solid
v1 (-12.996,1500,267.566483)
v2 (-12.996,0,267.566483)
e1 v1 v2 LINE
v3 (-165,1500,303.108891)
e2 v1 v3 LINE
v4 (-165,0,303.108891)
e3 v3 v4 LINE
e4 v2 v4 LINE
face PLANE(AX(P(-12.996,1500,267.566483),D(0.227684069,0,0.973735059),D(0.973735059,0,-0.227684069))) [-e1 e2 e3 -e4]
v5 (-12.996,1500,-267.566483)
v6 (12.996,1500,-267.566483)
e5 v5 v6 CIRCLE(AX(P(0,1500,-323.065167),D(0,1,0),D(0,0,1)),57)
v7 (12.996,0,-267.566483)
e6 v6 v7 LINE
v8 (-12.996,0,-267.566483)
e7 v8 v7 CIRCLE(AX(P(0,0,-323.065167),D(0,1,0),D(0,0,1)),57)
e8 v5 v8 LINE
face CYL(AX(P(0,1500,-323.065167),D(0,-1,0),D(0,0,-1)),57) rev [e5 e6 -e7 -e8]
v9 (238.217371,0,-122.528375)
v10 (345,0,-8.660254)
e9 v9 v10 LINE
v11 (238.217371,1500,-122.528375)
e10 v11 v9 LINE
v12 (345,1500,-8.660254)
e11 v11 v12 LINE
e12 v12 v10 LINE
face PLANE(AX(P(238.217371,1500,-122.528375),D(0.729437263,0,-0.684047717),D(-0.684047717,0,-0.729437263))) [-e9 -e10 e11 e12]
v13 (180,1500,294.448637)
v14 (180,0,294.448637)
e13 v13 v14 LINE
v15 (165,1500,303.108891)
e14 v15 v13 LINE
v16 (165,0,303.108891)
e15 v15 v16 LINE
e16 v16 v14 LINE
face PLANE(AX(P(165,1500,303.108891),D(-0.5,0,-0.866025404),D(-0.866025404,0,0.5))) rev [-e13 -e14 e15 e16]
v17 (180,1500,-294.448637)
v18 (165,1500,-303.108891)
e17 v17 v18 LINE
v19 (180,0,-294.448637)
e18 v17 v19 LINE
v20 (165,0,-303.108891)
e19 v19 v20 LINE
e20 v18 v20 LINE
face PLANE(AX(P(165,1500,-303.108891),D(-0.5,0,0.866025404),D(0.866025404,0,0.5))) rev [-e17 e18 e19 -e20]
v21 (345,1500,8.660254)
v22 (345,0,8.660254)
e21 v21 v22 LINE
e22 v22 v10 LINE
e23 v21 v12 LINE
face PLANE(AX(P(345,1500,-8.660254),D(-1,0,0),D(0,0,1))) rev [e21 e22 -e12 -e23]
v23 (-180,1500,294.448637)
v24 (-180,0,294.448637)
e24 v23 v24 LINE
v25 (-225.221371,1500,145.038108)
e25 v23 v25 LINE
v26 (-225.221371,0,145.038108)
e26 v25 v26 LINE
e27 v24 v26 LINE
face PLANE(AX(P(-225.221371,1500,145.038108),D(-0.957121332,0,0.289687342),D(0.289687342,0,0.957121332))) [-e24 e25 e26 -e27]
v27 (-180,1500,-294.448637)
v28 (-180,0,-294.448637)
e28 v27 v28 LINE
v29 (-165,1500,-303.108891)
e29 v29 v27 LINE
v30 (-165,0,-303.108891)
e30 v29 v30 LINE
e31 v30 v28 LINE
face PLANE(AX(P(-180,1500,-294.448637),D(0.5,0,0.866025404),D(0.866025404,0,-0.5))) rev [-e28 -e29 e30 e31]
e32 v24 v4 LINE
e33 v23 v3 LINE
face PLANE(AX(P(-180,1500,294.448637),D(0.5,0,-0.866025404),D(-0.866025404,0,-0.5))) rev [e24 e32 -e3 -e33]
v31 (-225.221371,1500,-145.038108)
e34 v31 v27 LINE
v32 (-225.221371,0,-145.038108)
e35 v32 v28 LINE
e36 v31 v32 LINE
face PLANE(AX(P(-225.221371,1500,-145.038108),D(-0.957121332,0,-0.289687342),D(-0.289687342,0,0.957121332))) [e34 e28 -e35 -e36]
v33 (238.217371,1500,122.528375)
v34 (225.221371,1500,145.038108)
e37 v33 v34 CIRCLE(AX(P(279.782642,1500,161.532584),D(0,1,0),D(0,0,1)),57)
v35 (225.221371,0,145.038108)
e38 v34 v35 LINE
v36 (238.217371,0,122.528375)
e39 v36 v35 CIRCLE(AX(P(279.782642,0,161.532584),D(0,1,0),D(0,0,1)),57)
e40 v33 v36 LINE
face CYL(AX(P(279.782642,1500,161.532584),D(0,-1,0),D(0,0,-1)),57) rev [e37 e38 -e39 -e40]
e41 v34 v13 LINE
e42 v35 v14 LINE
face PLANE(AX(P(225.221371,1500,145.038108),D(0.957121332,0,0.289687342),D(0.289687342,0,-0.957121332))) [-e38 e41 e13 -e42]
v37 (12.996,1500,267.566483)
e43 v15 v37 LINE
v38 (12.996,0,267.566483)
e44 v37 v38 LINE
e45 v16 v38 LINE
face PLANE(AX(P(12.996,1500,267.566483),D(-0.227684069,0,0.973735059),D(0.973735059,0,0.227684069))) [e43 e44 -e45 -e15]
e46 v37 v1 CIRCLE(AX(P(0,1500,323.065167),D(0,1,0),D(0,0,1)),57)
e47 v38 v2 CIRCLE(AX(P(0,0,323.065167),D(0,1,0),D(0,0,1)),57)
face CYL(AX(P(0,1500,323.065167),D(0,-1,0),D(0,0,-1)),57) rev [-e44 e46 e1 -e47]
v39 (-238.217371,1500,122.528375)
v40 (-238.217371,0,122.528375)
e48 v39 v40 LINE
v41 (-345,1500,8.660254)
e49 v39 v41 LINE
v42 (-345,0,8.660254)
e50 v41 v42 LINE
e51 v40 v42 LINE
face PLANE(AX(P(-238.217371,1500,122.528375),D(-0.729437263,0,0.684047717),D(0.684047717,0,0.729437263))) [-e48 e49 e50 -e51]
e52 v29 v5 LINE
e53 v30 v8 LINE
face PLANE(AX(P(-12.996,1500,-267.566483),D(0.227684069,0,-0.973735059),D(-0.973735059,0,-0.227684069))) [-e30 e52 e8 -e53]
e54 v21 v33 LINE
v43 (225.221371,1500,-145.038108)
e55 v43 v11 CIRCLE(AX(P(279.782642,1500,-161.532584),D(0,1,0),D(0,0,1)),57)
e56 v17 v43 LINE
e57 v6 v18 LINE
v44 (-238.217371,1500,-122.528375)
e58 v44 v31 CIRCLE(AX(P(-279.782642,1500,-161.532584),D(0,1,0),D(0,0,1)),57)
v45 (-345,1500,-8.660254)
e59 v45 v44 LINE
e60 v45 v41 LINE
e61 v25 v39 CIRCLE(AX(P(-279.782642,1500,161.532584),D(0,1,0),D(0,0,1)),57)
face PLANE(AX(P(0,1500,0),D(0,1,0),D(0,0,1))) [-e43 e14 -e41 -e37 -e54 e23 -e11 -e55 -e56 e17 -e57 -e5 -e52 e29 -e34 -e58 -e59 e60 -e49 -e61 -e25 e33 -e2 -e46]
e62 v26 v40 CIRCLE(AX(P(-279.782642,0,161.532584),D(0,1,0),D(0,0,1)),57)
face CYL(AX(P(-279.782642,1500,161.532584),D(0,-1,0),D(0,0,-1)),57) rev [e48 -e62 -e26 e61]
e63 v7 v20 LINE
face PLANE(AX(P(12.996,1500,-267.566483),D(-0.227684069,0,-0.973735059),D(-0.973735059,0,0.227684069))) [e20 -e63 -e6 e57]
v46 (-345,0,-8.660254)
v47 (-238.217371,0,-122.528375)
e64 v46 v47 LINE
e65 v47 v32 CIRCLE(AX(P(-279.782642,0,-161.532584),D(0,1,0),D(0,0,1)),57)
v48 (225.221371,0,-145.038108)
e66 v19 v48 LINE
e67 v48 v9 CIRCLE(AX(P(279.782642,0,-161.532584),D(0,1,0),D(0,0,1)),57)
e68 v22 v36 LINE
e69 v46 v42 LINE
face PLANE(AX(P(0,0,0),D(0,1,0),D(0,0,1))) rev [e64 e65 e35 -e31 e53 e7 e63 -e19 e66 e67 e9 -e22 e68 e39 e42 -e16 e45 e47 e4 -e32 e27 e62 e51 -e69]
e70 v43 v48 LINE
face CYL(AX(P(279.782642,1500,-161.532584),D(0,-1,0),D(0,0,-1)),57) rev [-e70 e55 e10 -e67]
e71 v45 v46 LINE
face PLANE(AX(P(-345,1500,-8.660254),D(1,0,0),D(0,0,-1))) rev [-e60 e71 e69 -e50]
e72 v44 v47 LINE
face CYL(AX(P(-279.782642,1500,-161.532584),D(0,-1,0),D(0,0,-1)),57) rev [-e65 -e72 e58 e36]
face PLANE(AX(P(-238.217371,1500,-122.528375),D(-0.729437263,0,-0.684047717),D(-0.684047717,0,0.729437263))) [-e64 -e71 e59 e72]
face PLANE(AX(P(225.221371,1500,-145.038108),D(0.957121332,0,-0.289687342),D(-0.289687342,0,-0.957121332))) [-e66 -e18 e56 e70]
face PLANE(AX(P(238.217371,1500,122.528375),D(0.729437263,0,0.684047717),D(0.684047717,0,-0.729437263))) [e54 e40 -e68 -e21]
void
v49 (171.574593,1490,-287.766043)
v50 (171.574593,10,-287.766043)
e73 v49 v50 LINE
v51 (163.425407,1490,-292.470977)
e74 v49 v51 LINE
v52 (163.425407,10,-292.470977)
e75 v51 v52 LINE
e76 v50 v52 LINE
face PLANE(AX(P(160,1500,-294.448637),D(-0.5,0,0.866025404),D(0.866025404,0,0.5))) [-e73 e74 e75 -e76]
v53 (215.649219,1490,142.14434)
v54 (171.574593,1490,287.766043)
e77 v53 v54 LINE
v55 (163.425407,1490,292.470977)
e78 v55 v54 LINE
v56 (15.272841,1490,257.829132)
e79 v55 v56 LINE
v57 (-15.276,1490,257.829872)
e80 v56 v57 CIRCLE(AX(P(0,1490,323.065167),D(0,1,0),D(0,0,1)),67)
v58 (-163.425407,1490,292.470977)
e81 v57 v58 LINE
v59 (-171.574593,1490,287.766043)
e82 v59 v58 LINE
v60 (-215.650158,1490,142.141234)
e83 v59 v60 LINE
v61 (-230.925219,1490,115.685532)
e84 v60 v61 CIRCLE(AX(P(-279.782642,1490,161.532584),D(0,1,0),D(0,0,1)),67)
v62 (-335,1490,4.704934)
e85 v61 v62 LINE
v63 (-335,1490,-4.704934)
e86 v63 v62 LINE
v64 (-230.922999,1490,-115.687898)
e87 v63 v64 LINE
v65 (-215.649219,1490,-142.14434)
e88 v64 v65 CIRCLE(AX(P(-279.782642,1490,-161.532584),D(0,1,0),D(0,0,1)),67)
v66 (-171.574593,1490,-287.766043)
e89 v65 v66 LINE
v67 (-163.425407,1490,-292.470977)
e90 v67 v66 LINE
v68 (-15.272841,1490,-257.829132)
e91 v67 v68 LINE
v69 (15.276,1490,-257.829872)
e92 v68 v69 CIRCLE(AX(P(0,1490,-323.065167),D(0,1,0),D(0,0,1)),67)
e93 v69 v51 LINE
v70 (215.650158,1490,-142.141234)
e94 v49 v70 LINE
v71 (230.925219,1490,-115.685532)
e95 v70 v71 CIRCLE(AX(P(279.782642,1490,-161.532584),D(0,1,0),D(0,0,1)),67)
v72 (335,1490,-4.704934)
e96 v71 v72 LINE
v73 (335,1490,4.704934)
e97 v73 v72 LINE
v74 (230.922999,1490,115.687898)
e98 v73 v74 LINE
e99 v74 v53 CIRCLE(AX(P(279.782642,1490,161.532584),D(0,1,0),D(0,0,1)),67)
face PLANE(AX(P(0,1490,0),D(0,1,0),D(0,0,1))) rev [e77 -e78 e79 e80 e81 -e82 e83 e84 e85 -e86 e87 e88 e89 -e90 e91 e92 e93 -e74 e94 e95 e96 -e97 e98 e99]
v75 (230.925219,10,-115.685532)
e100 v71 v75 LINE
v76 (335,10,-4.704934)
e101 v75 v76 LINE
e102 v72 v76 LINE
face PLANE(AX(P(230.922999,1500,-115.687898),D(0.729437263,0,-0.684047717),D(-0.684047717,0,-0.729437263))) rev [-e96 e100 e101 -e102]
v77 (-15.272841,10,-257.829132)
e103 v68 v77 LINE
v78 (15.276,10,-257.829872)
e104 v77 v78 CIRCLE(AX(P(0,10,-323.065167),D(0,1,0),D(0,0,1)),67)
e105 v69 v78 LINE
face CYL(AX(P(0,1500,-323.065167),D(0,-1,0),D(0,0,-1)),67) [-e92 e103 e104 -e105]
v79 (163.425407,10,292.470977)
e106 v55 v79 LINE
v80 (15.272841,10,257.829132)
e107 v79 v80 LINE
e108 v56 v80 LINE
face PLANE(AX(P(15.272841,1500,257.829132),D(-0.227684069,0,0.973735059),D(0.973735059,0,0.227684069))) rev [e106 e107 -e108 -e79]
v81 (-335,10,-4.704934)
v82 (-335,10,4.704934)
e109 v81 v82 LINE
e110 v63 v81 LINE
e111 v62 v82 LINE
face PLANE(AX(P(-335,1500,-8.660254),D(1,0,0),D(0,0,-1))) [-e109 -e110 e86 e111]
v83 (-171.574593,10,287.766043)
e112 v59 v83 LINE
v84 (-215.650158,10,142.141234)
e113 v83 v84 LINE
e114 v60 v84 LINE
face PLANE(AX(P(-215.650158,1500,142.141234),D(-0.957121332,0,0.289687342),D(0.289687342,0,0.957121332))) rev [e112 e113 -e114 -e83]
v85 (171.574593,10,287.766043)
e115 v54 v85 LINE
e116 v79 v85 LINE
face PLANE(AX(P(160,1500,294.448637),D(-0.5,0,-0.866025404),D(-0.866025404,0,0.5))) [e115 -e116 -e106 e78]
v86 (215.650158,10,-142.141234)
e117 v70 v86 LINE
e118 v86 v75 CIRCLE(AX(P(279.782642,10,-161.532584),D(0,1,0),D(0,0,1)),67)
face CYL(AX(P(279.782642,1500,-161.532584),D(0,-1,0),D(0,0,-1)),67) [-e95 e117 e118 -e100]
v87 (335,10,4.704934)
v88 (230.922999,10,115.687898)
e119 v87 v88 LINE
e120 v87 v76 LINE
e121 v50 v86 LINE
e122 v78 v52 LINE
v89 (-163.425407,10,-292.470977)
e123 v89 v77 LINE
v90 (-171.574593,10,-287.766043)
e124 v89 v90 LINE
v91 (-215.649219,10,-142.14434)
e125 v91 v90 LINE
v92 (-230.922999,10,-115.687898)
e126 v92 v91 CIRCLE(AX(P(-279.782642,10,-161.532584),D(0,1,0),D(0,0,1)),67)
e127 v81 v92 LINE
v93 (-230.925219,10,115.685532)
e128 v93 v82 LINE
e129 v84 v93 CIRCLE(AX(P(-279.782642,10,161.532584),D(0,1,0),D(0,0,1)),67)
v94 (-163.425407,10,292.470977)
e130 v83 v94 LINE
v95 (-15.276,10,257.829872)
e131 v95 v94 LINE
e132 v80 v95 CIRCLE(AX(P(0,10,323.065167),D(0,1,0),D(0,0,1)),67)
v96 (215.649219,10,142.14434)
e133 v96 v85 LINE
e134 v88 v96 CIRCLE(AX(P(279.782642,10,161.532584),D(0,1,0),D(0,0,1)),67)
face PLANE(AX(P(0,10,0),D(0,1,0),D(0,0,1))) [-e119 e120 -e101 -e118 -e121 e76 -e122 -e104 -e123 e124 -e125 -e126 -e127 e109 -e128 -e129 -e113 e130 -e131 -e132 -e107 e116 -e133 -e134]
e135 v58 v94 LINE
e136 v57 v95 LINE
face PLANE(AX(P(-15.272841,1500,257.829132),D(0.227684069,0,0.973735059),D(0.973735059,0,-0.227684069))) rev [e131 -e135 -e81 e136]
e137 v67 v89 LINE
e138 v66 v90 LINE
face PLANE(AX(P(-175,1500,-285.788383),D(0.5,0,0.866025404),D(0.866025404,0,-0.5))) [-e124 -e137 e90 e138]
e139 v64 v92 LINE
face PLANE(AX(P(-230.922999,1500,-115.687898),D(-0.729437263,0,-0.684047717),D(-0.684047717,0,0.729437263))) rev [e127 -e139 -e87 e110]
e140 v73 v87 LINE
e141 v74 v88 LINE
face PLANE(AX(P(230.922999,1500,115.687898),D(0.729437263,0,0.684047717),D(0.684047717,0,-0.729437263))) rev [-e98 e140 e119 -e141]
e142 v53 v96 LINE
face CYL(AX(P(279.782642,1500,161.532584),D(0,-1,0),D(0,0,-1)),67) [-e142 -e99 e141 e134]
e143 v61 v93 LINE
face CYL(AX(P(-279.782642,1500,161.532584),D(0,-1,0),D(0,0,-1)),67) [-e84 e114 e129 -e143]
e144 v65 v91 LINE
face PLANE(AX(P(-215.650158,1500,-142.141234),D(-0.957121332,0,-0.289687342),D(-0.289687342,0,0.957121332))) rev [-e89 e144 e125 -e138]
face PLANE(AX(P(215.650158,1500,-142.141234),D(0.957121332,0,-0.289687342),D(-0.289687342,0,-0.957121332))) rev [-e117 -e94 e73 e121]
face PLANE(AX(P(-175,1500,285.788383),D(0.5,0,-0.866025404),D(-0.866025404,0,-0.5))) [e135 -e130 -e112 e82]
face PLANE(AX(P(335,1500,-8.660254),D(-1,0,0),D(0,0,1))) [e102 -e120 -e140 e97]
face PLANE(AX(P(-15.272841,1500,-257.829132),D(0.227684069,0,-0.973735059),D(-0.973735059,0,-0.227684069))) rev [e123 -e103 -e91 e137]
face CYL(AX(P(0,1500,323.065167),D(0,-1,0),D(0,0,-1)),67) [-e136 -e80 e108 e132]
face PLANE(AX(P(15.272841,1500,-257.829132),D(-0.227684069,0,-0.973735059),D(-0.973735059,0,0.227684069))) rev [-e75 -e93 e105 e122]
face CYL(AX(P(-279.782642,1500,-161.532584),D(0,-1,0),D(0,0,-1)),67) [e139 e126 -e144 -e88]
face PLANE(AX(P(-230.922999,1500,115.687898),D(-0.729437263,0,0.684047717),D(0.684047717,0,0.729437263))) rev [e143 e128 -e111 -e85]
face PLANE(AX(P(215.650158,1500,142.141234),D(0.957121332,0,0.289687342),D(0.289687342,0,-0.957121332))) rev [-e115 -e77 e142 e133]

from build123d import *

# Parameters (mm, degrees)
EXTRUDE_1_DEPTH     = 1500
CUT_EXTRUDE_4_DEPTH = 1500
SHELL_START         = 10
SHELL_3_DEPTH       = 1480


# Read off the part's stored shape, not the designer's step: 抽壳3
with BuildPart() as part:
    # 草图2 → 凸台-拉伸1 (new body)
    with BuildSketch(Plane(origin=(0, 0, 0), x_dir=(1, 0, 0), z_dir=(0, 1, 0))):
        Polygon((345, 8.660254038), (180, 294.448637287), (165, 303.108891325), (-165, 303.108891325), (-180, 294.448637287), (-345, 8.660254038), (-345, -8.660254038), (-180, -294.448637287), (-165, -303.108891325), (165, -303.108891325), (180, -294.448637287), (345, -8.660254038), align=None)
    extrude(amount=EXTRUDE_1_DEPTH)

    # 草图5 → 切除-拉伸4 (cut)
    with BuildSketch(Plane(origin=(0, 0, 0), x_dir=(1, 0, 0), z_dir=(0, 1, 0))):
        with BuildLine():
            Line((238.21737139, 122.528375301), (345, 8.660254038))
            Line((345, 8.660254038), (379.520233023, 28.590519866))
            Line((379.520233023, 28.590519866), (334.34391274, 178.027059826))
            ThreePointArc((334.34391274, 178.027059826), (329.146090081, 190.032583711), (321.34791274, 200.536792121))
            Line((321.34791274, 200.536792121), (214.969297582, 314.638170659))
            Line((214.969297582, 314.638170659), (180, 294.448637287))
            Line((180, 294.448637287), (225.22137139, 145.038107596))
            ThreePointArc((225.22137139, 145.038107596), (230.419194049, 133.032583711), (238.21737139, 122.528375301))
        make_face()
        with BuildLine():
            Line((225.22137139, -145.038107596), (180, -294.448637287))
            Line((180, -294.448637287), (214.520233023, -314.378903115))
            Line((214.520233023, -314.378903115), (321.34791274, -200.536792121))
            ThreePointArc((321.34791274, -200.536792121), (329.146090081, -190.032583711), (334.34391274, -178.027059826))
            Line((334.34391274, -178.027059826), (379.969297582, -28.84978741))
            Line((379.969297582, -28.84978741), (345, -8.660254038))
            Line((345, -8.660254038), (238.21737139, -122.528375301))
            ThreePointArc((238.21737139, -122.528375301), (230.419194049, -133.032583711), (225.22137139, -145.038107596))
        make_face()
        with BuildLine():
            Line((12.996, 267.566482896), (165, 303.108891325))
            Line((165, 303.108891325), (165, 342.969422981))
            Line((165, 342.969422981), (12.996, 378.563851946))
            ThreePointArc((12.996, 378.563851946), (0, 380.065167421), (-12.996, 378.563851946))
            Line((-12.996, 378.563851946), (-165, 343.487958069))
            Line((-165, 343.487958069), (-165, 303.108891325))
            Line((-165, 303.108891325), (-12.996, 267.566482896))
            ThreePointArc((-12.996, 267.566482896), (0, 266.065167421), (12.996, 267.566482896))
        make_face()
        with BuildLine():
            Line((-12.996, -267.566482896), (-165, -303.108891325))
            Line((-165, -303.108891325), (-165, -342.969422981))
            Line((-165, -342.969422981), (-12.996, -378.563851946))
            ThreePointArc((-12.996, -378.563851946), (0, -380.065167421), (12.996, -378.563851946))
            Line((12.996, -378.563851946), (165, -343.487958069))
            Line((165, -343.487958069), (165, -303.108891325))
            Line((165, -303.108891325), (12.996, -267.566482896))
            ThreePointArc((12.996, -267.566482896), (0, -266.065167421), (-12.996, -267.566482896))
        make_face()
        with BuildLine():
            Line((-238.21737139, -122.528375301), (-345, -8.660254038))
            Line((-345, -8.660254038), (-379.520233023, -28.590519866))
            Line((-379.520233023, -28.590519866), (-334.34391274, -178.027059826))
            ThreePointArc((-334.34391274, -178.027059826), (-329.146090081, -190.032583711), (-321.34791274, -200.536792121))
            Line((-321.34791274, -200.536792121), (-214.969297582, -314.638170659))
            Line((-214.969297582, -314.638170659), (-180, -294.448637287))
            Line((-180, -294.448637287), (-225.22137139, -145.038107596))
            ThreePointArc((-225.22137139, -145.038107596), (-230.419194049, -133.032583711), (-238.21737139, -122.528375301))
        make_face()
        with BuildLine():
            Line((-225.22137139, 145.038107596), (-180, 294.448637287))
            Line((-180, 294.448637287), (-214.520233023, 314.378903115))
            Line((-214.520233023, 314.378903115), (-321.34791274, 200.536792121))
            ThreePointArc((-321.34791274, 200.536792121), (-329.14609008, 190.032583711), (-334.34391274, 178.027059826))
            Line((-334.34391274, 178.027059826), (-379.969297582, 28.84978741))
            Line((-379.969297582, 28.84978741), (-345, 8.660254038))
            Line((-345, 8.660254038), (-238.21737139, 122.528375301))
            ThreePointArc((-238.21737139, 122.528375301), (-230.419194049, 133.032583711), (-225.22137139, 145.038107596))
        make_face()
    extrude(amount=CUT_EXTRUDE_4_DEPTH, mode=Mode.SUBTRACT)

    # 抽壳3 outline → 抽壳3 (cut)
    with BuildSketch(Plane(origin=(0, 0, 0), x_dir=(1, 0, 0), z_dir=(0, 1, 0)).offset(SHELL_START)):
        with BuildLine():
            Line((-163.425407286, 292.470977468), (-171.574592714, 287.766043068))
            Line((-171.574592714, 287.766043068), (-215.64921864, 142.144339856))
            ThreePointArc((-215.64921864, 142.144339856), (-221.758128865, 128.033988697), (-230.922998431, 115.687897825))
            Line((-230.922998431, 115.687897825), (-335, 4.7049344))
            Line((-335, 4.7049344), (-335, -4.7049344))
            Line((-335, -4.7049344), (-230.92521864, -115.68553172))
            ThreePointArc((-230.92521864, -115.68553172), (-221.759751192, -128.031178744), (-215.650157642, -142.141234046))
            Line((-215.650157642, -142.141234046), (-171.574592714, -287.766043068))
            Line((-171.574592714, -287.766043068), (-163.425407286, -292.470977468))
            Line((-163.425407286, -292.470977468), (-15.276, -257.829871576))
            ThreePointArc((-15.276, -257.829871576), (-0.001622327, -256.065167441), (15.272840788, -257.829131872))
            Line((15.272840788, -257.829131872), (163.425407286, -292.470977468))
            Line((163.425407286, -292.470977468), (171.574592714, -287.766043068))
            Line((171.574592714, -287.766043068), (215.64921864, -142.144339856))
            ThreePointArc((215.64921864, -142.144339856), (221.758128865, -128.033988697), (230.922998431, -115.687897825))
            Line((230.922998431, -115.687897825), (335, -4.704934401))
            Line((335, -4.704934401), (335, 4.7049344))
            Line((335, 4.7049344), (230.92521864, 115.68553172))
            ThreePointArc((230.92521864, 115.68553172), (221.759751192, 128.031178744), (215.650157642, 142.141234046))
            Line((215.650157642, 142.141234046), (171.574592714, 287.766043068))
            Line((171.574592714, 287.766043068), (163.425407286, 292.470977468))
            Line((163.425407286, 292.470977468), (15.276, 257.829871576))
            ThreePointArc((15.276, 257.829871576), (0.001622327, 256.065167441), (-15.272840788, 257.829131872))
            Line((-15.272840788, 257.829131872), (-163.425407286, 292.470977468))
        make_face()
    extrude(amount=SHELL_3_DEPTH, mode=Mode.SUBTRACT)


solid = part.part
